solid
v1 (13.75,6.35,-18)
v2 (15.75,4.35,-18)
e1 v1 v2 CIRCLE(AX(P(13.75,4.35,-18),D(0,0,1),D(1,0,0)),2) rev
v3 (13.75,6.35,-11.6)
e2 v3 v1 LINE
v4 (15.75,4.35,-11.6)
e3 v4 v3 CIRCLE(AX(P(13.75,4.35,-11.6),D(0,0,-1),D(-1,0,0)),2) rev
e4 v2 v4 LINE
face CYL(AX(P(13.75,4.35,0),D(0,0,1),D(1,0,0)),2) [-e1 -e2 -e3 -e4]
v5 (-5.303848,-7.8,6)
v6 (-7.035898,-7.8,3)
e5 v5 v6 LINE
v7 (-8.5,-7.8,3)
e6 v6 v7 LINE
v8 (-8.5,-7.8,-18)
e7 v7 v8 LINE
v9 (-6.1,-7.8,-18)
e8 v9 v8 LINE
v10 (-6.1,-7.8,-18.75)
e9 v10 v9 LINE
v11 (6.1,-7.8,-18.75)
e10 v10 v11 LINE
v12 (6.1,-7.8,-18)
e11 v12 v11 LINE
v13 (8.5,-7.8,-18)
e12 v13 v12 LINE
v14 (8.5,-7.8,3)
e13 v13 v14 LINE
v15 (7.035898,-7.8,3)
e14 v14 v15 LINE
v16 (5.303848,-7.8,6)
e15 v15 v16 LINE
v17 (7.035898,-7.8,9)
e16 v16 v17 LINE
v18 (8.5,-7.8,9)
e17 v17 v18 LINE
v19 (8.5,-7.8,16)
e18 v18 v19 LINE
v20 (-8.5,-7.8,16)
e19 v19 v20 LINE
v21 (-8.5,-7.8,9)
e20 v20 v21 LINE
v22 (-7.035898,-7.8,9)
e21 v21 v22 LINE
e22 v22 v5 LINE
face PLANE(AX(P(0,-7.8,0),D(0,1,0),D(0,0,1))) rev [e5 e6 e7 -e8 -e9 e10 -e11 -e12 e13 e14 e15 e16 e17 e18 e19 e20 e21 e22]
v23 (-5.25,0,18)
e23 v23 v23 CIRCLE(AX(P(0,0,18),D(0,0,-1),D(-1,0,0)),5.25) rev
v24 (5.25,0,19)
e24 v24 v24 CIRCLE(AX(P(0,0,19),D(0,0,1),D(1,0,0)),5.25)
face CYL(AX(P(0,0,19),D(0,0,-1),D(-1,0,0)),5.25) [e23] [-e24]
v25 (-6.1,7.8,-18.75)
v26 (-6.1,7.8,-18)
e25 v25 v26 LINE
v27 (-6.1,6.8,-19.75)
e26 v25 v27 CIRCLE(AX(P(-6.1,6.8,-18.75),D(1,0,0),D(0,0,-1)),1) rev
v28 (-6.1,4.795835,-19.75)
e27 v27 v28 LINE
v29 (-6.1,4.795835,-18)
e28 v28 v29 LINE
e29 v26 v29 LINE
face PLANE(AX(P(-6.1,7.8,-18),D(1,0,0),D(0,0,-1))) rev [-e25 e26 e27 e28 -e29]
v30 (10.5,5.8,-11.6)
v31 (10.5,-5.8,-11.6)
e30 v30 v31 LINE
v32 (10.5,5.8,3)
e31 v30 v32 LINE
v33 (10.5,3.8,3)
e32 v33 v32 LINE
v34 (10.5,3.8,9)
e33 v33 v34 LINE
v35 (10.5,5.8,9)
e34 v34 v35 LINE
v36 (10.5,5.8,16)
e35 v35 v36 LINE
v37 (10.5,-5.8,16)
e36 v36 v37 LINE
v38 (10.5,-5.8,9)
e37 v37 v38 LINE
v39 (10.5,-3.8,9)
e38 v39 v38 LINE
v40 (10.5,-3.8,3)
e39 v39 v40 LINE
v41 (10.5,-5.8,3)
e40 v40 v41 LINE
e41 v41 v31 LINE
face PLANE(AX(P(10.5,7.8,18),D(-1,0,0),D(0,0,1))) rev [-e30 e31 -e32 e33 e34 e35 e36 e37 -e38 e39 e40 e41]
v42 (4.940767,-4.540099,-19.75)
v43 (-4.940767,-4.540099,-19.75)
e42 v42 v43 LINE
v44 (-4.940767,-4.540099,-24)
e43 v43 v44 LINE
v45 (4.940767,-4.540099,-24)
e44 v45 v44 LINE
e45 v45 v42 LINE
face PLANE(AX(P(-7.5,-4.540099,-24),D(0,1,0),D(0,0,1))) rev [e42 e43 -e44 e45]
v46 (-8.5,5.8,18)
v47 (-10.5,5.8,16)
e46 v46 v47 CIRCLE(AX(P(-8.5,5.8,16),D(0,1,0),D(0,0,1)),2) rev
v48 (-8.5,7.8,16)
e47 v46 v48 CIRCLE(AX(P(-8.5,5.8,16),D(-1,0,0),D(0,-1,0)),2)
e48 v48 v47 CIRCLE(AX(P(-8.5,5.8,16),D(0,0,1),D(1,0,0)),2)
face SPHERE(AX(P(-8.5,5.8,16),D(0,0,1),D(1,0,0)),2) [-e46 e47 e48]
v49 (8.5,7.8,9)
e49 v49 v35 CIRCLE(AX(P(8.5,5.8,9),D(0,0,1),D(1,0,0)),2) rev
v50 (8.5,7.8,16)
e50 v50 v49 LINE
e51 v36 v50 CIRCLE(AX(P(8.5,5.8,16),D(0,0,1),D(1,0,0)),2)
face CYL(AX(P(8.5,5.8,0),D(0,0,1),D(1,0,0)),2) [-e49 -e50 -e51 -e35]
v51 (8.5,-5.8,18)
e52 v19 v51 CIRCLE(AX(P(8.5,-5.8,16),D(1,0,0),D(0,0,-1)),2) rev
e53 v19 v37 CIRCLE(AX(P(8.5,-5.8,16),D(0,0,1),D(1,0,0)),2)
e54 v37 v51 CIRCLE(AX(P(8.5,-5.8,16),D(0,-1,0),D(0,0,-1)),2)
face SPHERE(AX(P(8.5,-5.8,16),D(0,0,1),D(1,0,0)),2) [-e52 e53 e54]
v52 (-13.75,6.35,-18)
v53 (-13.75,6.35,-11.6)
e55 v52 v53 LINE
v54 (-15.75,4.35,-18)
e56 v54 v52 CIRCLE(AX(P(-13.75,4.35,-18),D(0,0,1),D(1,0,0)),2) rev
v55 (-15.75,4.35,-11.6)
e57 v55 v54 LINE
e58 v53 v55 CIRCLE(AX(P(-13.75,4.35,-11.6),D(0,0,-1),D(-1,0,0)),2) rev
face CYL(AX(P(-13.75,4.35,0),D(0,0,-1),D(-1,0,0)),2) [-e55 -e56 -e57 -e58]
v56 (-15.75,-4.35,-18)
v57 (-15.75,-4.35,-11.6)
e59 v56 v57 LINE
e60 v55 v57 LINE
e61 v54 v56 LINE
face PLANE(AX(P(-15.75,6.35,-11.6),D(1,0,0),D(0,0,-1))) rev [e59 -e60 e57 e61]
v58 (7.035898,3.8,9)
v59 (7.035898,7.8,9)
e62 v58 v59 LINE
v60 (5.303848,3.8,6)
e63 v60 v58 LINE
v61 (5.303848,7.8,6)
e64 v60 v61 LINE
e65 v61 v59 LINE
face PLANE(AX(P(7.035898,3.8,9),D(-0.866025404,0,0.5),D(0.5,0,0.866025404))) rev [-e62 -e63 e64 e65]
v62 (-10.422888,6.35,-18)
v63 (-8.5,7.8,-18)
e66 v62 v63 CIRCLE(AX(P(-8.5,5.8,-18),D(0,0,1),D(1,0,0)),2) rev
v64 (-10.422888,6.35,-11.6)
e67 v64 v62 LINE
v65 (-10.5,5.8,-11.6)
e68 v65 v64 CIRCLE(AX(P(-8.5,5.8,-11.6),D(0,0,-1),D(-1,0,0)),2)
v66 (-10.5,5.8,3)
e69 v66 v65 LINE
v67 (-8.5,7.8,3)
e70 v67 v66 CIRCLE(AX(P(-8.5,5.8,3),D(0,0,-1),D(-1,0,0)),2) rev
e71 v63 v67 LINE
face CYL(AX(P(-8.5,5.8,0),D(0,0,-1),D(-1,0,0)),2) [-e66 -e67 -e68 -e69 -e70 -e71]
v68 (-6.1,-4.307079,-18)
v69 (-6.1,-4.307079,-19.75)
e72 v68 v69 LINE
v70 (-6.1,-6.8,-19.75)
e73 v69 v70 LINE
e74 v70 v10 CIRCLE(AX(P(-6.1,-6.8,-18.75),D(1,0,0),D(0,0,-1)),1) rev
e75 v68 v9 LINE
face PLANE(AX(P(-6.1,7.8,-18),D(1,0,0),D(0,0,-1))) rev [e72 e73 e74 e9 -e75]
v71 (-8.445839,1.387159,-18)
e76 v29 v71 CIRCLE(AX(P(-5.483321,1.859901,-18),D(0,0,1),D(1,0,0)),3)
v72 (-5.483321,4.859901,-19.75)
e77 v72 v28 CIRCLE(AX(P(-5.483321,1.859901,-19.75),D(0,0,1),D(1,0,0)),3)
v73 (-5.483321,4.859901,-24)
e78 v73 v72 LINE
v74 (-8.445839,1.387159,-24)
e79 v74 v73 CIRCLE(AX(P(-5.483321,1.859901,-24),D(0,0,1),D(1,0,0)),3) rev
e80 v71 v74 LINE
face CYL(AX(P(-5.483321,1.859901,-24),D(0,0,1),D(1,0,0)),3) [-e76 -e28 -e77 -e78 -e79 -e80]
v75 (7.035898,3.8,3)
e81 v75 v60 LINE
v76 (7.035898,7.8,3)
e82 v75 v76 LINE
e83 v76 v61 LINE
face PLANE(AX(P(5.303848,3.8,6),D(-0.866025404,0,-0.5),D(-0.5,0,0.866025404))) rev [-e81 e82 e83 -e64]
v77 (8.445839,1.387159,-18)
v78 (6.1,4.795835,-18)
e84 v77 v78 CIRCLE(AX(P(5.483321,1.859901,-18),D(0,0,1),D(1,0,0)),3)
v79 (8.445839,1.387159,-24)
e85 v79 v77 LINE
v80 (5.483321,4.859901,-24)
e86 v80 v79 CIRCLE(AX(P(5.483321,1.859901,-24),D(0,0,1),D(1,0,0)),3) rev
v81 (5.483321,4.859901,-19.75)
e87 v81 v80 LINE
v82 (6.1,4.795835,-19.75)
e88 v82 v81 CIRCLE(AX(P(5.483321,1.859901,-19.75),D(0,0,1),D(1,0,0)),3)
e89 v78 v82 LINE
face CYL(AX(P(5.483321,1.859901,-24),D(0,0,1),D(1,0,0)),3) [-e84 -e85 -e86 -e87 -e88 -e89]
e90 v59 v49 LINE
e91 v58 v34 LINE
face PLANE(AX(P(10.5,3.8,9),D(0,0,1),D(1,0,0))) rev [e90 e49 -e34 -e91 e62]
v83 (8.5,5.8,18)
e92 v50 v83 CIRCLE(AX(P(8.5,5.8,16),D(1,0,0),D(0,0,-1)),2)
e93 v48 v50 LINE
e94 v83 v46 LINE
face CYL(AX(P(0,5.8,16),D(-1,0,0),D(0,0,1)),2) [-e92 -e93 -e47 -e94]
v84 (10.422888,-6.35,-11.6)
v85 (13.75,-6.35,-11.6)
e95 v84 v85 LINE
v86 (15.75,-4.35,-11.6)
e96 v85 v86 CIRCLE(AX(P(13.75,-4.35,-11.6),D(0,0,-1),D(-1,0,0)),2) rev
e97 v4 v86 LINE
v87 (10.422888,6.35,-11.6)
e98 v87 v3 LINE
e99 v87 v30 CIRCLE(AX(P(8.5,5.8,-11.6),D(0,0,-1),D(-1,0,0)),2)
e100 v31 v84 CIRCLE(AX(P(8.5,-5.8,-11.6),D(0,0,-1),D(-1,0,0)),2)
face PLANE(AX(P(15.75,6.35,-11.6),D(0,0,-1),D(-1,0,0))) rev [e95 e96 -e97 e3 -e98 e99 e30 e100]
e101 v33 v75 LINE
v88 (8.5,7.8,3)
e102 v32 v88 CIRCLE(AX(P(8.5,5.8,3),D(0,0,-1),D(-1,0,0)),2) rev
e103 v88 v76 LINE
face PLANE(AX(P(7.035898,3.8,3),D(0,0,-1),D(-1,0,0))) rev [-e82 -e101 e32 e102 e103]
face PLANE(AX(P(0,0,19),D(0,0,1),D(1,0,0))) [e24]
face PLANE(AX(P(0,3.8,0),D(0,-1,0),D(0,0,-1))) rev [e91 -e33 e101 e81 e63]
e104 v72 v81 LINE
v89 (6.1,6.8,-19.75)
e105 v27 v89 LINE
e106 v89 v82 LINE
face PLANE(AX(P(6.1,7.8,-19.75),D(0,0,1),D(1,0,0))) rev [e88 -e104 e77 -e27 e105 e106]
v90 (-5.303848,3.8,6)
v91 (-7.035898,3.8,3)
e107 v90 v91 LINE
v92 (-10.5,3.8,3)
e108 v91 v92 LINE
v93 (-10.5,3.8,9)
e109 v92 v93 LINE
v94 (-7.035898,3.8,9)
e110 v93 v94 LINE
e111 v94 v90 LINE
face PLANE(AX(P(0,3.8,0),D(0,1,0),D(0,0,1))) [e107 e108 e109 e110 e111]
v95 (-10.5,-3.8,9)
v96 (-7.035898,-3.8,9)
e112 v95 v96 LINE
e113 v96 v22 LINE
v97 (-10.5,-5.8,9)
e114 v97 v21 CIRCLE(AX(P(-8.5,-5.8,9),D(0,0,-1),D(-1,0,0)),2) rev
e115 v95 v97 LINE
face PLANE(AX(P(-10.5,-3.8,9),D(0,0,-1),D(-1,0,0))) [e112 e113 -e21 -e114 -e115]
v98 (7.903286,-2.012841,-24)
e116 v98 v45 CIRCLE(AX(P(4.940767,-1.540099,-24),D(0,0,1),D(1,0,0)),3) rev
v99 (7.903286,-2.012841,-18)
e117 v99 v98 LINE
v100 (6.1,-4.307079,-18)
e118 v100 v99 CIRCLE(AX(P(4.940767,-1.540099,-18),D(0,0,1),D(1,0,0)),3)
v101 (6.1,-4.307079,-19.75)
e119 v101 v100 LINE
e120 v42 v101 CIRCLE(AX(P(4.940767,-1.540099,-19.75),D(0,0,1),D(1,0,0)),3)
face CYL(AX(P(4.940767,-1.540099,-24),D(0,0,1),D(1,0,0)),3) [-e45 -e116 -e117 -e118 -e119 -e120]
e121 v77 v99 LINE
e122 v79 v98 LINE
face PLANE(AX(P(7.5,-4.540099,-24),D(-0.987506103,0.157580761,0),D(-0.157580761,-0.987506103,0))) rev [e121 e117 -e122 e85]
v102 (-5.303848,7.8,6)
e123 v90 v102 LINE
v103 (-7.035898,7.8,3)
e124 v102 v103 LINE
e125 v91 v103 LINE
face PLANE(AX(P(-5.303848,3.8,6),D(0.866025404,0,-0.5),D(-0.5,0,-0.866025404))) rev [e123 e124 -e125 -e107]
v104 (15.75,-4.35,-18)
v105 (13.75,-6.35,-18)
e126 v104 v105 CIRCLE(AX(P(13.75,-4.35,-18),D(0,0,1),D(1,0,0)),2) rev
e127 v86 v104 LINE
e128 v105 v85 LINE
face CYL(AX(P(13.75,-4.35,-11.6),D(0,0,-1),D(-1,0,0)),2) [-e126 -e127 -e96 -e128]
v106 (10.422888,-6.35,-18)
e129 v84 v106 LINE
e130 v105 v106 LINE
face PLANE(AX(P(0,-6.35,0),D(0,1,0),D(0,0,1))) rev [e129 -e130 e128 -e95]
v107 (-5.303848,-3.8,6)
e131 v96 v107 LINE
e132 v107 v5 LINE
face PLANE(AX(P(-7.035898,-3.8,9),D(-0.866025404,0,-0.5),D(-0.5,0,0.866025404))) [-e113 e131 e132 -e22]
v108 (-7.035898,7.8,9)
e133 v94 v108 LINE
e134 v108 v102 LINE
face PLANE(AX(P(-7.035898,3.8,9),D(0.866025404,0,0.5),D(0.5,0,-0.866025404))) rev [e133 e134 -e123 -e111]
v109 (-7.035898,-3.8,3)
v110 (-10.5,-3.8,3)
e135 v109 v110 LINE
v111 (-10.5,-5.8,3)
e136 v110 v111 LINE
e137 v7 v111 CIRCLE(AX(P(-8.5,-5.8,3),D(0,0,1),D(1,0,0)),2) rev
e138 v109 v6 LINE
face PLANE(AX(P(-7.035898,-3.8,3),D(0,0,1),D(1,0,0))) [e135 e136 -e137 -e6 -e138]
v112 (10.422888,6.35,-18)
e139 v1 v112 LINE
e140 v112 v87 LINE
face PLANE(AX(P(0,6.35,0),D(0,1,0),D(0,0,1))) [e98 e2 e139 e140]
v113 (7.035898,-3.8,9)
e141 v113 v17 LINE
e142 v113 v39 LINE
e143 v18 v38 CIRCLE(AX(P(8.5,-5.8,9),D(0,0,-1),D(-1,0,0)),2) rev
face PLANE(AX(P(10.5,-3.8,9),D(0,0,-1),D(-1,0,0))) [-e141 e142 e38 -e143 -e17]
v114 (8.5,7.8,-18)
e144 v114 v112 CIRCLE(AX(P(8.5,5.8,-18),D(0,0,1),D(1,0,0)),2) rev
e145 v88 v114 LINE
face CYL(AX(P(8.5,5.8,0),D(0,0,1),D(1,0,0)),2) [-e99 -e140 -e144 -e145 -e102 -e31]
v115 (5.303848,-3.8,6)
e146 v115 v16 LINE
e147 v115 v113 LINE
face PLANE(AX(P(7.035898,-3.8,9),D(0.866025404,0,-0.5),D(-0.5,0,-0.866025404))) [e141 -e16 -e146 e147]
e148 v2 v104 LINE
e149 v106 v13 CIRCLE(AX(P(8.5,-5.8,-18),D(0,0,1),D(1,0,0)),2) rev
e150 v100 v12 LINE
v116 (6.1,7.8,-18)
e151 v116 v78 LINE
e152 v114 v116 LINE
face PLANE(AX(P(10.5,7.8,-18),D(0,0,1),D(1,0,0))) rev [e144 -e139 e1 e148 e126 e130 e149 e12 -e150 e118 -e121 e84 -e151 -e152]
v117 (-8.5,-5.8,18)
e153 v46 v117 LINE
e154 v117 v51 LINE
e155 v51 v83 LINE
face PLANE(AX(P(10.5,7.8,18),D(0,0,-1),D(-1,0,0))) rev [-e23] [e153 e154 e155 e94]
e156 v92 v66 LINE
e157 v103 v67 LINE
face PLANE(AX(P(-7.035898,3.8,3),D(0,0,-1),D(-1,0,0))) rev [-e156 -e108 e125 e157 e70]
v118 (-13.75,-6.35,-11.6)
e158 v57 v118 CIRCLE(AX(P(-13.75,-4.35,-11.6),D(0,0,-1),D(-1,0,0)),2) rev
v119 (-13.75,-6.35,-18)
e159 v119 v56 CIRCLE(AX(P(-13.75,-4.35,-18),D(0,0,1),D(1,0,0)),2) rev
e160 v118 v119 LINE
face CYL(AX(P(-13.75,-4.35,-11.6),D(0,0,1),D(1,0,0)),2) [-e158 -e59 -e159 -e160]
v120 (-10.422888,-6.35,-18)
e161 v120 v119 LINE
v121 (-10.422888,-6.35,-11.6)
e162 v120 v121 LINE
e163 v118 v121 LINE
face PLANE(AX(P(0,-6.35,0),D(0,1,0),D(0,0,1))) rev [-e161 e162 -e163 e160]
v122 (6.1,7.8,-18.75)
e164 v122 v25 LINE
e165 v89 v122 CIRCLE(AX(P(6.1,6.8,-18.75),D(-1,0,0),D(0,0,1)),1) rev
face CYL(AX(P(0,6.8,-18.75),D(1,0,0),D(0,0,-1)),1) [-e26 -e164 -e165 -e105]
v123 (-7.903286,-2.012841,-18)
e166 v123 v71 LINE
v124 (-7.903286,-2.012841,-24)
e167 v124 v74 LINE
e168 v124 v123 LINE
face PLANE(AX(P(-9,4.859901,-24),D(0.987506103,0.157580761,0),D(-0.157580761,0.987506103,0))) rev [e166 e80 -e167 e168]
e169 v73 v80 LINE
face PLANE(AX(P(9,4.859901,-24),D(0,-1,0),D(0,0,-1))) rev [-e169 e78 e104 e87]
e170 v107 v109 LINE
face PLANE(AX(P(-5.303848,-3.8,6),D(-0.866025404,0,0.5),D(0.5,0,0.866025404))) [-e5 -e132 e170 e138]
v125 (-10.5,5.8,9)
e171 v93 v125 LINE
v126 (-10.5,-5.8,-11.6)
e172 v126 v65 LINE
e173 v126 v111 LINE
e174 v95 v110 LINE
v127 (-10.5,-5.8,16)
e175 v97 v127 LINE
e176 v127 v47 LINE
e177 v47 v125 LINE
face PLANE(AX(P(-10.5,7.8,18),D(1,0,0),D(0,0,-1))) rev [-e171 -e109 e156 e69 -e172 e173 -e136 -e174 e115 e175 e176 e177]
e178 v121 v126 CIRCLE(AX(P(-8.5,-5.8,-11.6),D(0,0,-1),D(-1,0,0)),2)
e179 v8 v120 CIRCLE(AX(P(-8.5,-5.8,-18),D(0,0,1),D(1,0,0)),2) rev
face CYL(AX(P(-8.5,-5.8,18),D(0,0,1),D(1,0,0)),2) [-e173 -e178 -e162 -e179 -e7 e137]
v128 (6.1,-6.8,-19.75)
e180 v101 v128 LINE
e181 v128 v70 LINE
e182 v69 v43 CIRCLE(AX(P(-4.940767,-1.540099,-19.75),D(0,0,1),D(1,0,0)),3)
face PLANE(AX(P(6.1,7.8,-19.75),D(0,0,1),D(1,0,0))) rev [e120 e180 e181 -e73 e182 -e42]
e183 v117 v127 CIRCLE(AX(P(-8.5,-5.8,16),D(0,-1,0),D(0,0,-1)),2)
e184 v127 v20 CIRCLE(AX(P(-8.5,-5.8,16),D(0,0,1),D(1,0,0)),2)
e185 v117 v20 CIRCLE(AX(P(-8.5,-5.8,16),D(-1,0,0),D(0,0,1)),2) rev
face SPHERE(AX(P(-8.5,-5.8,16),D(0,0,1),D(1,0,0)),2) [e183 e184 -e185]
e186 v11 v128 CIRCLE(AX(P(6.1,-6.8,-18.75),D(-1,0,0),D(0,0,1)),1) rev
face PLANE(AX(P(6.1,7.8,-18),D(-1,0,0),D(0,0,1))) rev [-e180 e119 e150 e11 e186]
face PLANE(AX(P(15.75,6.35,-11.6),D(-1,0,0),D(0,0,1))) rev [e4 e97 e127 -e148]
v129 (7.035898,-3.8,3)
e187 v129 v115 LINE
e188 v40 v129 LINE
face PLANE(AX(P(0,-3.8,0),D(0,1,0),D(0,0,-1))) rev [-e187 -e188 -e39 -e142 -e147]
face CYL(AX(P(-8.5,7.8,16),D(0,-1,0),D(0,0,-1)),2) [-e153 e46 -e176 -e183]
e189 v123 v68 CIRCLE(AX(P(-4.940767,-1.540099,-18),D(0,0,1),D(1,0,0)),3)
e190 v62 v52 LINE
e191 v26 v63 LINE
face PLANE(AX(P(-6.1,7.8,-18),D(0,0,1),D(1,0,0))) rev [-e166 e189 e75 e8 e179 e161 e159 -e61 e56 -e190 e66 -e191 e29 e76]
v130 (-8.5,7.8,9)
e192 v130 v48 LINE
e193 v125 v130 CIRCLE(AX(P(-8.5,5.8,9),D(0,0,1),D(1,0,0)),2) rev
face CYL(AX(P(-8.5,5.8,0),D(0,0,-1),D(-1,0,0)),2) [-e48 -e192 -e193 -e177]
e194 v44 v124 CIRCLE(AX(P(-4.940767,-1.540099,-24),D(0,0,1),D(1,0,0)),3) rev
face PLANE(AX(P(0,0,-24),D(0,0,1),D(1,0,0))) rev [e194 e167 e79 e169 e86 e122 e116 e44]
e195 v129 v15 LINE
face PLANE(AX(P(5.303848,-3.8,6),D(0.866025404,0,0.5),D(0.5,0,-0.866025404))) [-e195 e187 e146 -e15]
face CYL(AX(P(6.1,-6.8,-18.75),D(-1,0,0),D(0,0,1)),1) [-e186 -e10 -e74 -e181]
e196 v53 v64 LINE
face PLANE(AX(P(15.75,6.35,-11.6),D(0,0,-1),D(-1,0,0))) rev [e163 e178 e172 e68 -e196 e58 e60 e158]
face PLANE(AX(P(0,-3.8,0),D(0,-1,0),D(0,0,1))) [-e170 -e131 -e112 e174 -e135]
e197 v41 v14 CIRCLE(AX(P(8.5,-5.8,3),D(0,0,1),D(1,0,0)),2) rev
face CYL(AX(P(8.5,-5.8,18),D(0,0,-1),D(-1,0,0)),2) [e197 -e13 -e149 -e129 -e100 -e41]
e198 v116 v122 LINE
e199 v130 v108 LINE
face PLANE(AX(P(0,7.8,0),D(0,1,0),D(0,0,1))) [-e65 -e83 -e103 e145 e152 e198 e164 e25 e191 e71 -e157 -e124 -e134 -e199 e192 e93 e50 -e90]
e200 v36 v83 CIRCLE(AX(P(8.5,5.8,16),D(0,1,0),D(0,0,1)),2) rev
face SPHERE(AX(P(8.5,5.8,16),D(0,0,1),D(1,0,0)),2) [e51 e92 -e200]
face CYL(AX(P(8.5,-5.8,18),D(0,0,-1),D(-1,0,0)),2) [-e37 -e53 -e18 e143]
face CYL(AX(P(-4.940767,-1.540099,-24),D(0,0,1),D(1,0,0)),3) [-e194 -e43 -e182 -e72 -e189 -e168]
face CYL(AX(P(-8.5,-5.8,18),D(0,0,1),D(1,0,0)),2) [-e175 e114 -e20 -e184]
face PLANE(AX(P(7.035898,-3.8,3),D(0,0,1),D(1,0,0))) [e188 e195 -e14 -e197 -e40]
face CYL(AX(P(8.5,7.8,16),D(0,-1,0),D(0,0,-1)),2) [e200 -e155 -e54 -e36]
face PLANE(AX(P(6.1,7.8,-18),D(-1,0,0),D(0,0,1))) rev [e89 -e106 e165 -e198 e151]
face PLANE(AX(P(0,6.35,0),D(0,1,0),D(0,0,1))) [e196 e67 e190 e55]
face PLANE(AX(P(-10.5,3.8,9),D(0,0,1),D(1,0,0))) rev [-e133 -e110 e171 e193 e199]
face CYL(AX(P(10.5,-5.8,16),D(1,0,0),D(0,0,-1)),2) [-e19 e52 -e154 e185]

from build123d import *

# Parameters (mm, degrees)
EXTRUDE_1_DEPTH     = 7.8
SKETCH_3_R          = 5.25
EXTRUDE_2_DEPTH     = 1
SKETCH_5_W          = 31.5
SKETCH_5_H          = 6.4
EXTRUDE_3_DEPTH     = 6.35
EXTRUDE_4_DEPTH     = 6
FILLET_1_R          = 3
FILLET_2_R          = 2
FILLET_3_R          = 1
CUT_EXTRUDE_1_DEPTH = 4


with BuildPart() as part:
    # 草图1 → 凸台-拉伸1 (new, symmetric)
    with BuildSketch(Plane(origin=(0, 0, 0), x_dir=(1, 0, 0), z_dir=(0, 1, 0))):
        Polygon((-6.1, 18), (-10.5, 18), (-10.5, -18), (10.5, -18), (10.5, 18), (6.1, 18), (6.1, 19.75), (-6.1, 19.75), align=None)
    extrude(amount=EXTRUDE_1_DEPTH, both=True)

    # 草图3 → 凸台-拉伸2 (add)
    with BuildSketch(Plane.XY.offset(18)):
        with Locations(Location((0, 0, 0), (0, 0, 180))):
            Circle(SKETCH_3_R)
    extrude(amount=EXTRUDE_2_DEPTH)

    # 草图5 → 凸台-拉伸3 (add, symmetric)
    with BuildSketch(Plane(origin=(0, 0, 0), x_dir=(1, 0, 0), z_dir=(0, 1, 0))):
        with Locations((0, 14.8)):
            Rectangle(SKETCH_5_W, SKETCH_5_H)
    extrude(amount=EXTRUDE_3_DEPTH, both=True)

    # 草图6 → 凸台-拉伸4 (add)
    with BuildSketch(Plane(origin=(0, 0, -18), x_dir=(-1, 0, 0), z_dir=(0, 0, -1))):
        Polygon((-9, 4.85990087), (9, 4.85990087), (7.5, -4.54009913), (-7.5, -4.54009913), align=None)
    extrude(amount=EXTRUDE_4_DEPTH)

    # 圆角1
    fillet_1_edges = [part.edges().sort_by_distance(p)[0] for p in [
        (-7.5, -4.54009913, -21),
        (7.5, -4.54009913, -21),
        (9, 4.85990087, -21),
        (-9, 4.85990087, -21),
    ]]
    fillet(fillet_1_edges, radius=FILLET_1_R)

    # 圆角2
    # the kernel refuses this fillet: 2 mm, written as the material it takes off along each edge
    with BuildSketch(Plane(origin=(-8.5, -5.8, 16), x_dir=(-1, 0, 0), z_dir=(0, -1, 0))) as fillet_2_piece_1_section:
        Polygon((0, 0), (FILLET_2_R, 0), (FILLET_2_R, -FILLET_2_R), (0, -FILLET_2_R), align=None)
    fillet_2_piece_1 = extrude(amount=FILLET_2_R, mode=Mode.PRIVATE)
    fillet_2_piece_1 = fillet_2_piece_1 - Plane(origin=(-8.5, -5.8, 16), x_dir=(0.7071067811865474, 0, -0.7071067811865476), z_dir=(0, -1, 0)) * Sphere(FILLET_2_R, mode=Mode.PRIVATE)
    add(fillet_2_piece_1, mode=Mode.SUBTRACT)
    with BuildSketch(Plane(origin=(8.5, -5.8, 16), x_dir=(0, -1, 0), z_dir=(1, 0, 0))) as fillet_2_piece_2_section:
        Polygon((0, 0), (FILLET_2_R, 0), (FILLET_2_R, -FILLET_2_R), (0, -FILLET_2_R), align=None)
    fillet_2_piece_2 = extrude(amount=FILLET_2_R, mode=Mode.PRIVATE)
    fillet_2_piece_2 = fillet_2_piece_2 - Plane(origin=(8.5, -5.8, 16), x_dir=(0, 0.7071067811865475, -0.7071067811865475), z_dir=(1, 0, 0)) * Sphere(FILLET_2_R, mode=Mode.PRIVATE)
    add(fillet_2_piece_2, mode=Mode.SUBTRACT)
    with BuildSketch(Plane(origin=(8.5, 5.8, 16), x_dir=(0, 1, 0), z_dir=(1, 0, 0))) as fillet_2_piece_3_section:
        Polygon((0, 0), (FILLET_2_R, 0), (FILLET_2_R, FILLET_2_R), (0, FILLET_2_R), align=None)
    fillet_2_piece_3 = extrude(amount=FILLET_2_R, mode=Mode.PRIVATE)
    fillet_2_piece_3 = fillet_2_piece_3 - Plane(origin=(8.5, 5.8, 16), x_dir=(0, -0.7071067811865475, -0.7071067811865475), z_dir=(1, 0, 0)) * Sphere(FILLET_2_R, mode=Mode.PRIVATE)
    add(fillet_2_piece_3, mode=Mode.SUBTRACT)
    with BuildSketch(Plane(origin=(-8.5, 5.8, 16), x_dir=(-1, 0, 0), z_dir=(0, 1, 0))) as fillet_2_piece_4_section:
        Polygon((0, 0), (FILLET_2_R, 0), (FILLET_2_R, FILLET_2_R), (0, FILLET_2_R), align=None)
    fillet_2_piece_4 = extrude(amount=FILLET_2_R, mode=Mode.PRIVATE)
    fillet_2_piece_4 = fillet_2_piece_4 - Plane(origin=(-8.5, 5.8, 16), x_dir=(0.7071067811865474, 0, -0.7071067811865476), z_dir=(0, 1, 0)) * Sphere(FILLET_2_R, mode=Mode.PRIVATE)
    add(fillet_2_piece_4, mode=Mode.SUBTRACT)
    with BuildSketch(Plane(origin=(-8.5, -7.8, 18), x_dir=(0, 0, -1), z_dir=(1, 0, 0))) as fillet_2_piece_5:
        with BuildLine():
            CenterArc((FILLET_2_R, FILLET_2_R), FILLET_2_R, 180, 90)
            Line((0, FILLET_2_R), (0, 0))
            Line((0, 0), (FILLET_2_R, 0))
        make_face()
    extrude(amount=17, mode=Mode.SUBTRACT)
    with BuildSketch(Plane(origin=(10.5, -5.8, 18), x_dir=(-1, 0, 0), z_dir=(0, 1, 0)), Plane(origin=(-10.5, -5.8, 18), x_dir=(0, 0, -1), z_dir=(0, 1, 0))) as fillet_2_piece_6:
        with BuildLine():
            CenterArc((FILLET_2_R, -FILLET_2_R), FILLET_2_R, 90, 90)
            Line((0, -FILLET_2_R), (0, 0))
            Line((0, 0), (FILLET_2_R, 0))
        make_face()
    extrude(amount=11.6, mode=Mode.SUBTRACT)
    with BuildSketch(Plane(origin=(-8.5, 7.8, 18), x_dir=(0, 0, -1), z_dir=(1, 0, 0))) as fillet_2_piece_7:
        with BuildLine():
            CenterArc((FILLET_2_R, -FILLET_2_R), FILLET_2_R, 90, 90)
            Line((0, -FILLET_2_R), (0, 0))
            Line((0, 0), (FILLET_2_R, 0))
        make_face()
    extrude(amount=17, mode=Mode.SUBTRACT)
    with BuildSketch(Plane(origin=(-10.5, -7.8, -23), x_dir=(1, 0, 0), z_dir=(0, 0, 1))) as fillet_2_piece_8_section:
        with BuildLine():
            CenterArc((FILLET_2_R, FILLET_2_R), FILLET_2_R, 180, 90)
            Line((0, FILLET_2_R), (0, 0))
            Line((0, 0), (FILLET_2_R, 0))
        make_face()
    fillet_2_piece_8 = extrude(amount=39, mode=Mode.PRIVATE)
    fillet_2_piece_8 = split(fillet_2_piece_8, bisect_by=Plane(origin=(-10.030513344, -6.35, -17.3), z_dir=(0, -1, 0)), keep=Keep.TOP, mode=Mode.PRIVATE)
    fillet_2_piece_8 = split(fillet_2_piece_8, bisect_by=Plane(origin=(-10.030513344, -7.391821247, -11.6), z_dir=(0, 0, -1)), keep=Keep.TOP, mode=Mode.PRIVATE)
    add(fillet_2_piece_8, mode=Mode.SUBTRACT)
    with BuildSketch(Plane(origin=(-10.5, -7.8, -23), x_dir=(1, 0, 0), z_dir=(0, 0, 1))) as fillet_2_piece_9_section:
        with BuildLine():
            CenterArc((FILLET_2_R, FILLET_2_R), FILLET_2_R, 180, 90)
            Line((0, FILLET_2_R), (0, 0))
            Line((0, 0), (FILLET_2_R, 0))
        make_face()
    fillet_2_piece_9 = extrude(amount=39, mode=Mode.PRIVATE)
    fillet_2_piece_9 = split(fillet_2_piece_9, bisect_by=Plane(origin=(-10.030513344, -6.35, 2.2), z_dir=(0, -1, 0)), keep=Keep.TOP, mode=Mode.PRIVATE)
    fillet_2_piece_9 = split(fillet_2_piece_9, bisect_by=Plane(origin=(-10.030513344, -7.391821247, -11.6), z_dir=(0, 0, 1)), keep=Keep.TOP, mode=Mode.PRIVATE)
    add(fillet_2_piece_9, mode=Mode.SUBTRACT)
    with BuildSketch(Plane(origin=(-10.5, -7.8, -23), x_dir=(1, 0, 0), z_dir=(0, 0, 1))) as fillet_2_piece_10_section:
        with BuildLine():
            CenterArc((FILLET_2_R, FILLET_2_R), FILLET_2_R, 180, 90)
            Line((0, FILLET_2_R), (0, 0))
            Line((0, 0), (FILLET_2_R, 0))
        make_face()
    fillet_2_piece_10 = extrude(amount=39, mode=Mode.PRIVATE)
    fillet_2_piece_10 = split(fillet_2_piece_10, bisect_by=Plane(origin=(-10.503237221, -6.35, 2.2), z_dir=(0, 1, 0)), keep=Keep.TOP, mode=Mode.PRIVATE)
    fillet_2_piece_10 = split(fillet_2_piece_10, bisect_by=Plane(origin=(-10.503237221, -6.128742069, -11.6), z_dir=(0, 0, 1)), keep=Keep.TOP, mode=Mode.PRIVATE)
    add(fillet_2_piece_10, mode=Mode.SUBTRACT)
    with BuildSketch(Plane(origin=(-10.5, 7.8, -23), x_dir=(0, -1, 0), z_dir=(0, 0, 1))) as fillet_2_piece_11_section:
        with BuildLine():
            CenterArc((FILLET_2_R, FILLET_2_R), FILLET_2_R, 180, 90)
            Line((0, FILLET_2_R), (0, 0))
            Line((0, 0), (FILLET_2_R, 0))
        make_face()
    fillet_2_piece_11 = extrude(amount=39, mode=Mode.PRIVATE)
    fillet_2_piece_11 = split(fillet_2_piece_11, bisect_by=Plane(origin=(-10.030513344, 7.391821247, -11.6), z_dir=(0, 0, -1)), keep=Keep.TOP, mode=Mode.PRIVATE)
    fillet_2_piece_11 = split(fillet_2_piece_11, bisect_by=Plane(origin=(-10.030513344, 6.35, -17.3), z_dir=(0, 1, 0)), keep=Keep.TOP, mode=Mode.PRIVATE)
    add(fillet_2_piece_11, mode=Mode.SUBTRACT)
    with BuildSketch(Plane(origin=(-10.5, 7.8, -23), x_dir=(0, -1, 0), z_dir=(0, 0, 1))) as fillet_2_piece_12_section:
        with BuildLine():
            CenterArc((FILLET_2_R, FILLET_2_R), FILLET_2_R, 180, 90)
            Line((0, FILLET_2_R), (0, 0))
            Line((0, 0), (FILLET_2_R, 0))
        make_face()
    fillet_2_piece_12 = extrude(amount=39, mode=Mode.PRIVATE)
    fillet_2_piece_12 = split(fillet_2_piece_12, bisect_by=Plane(origin=(-10.503237221, 6.128742069, -11.6), z_dir=(0, 0, 1)), keep=Keep.TOP, mode=Mode.PRIVATE)
    fillet_2_piece_12 = split(fillet_2_piece_12, bisect_by=Plane(origin=(-10.503237221, 6.35, 2.2), z_dir=(0, -1, 0)), keep=Keep.TOP, mode=Mode.PRIVATE)
    add(fillet_2_piece_12, mode=Mode.SUBTRACT)
    with BuildSketch(Plane(origin=(-10.5, 7.8, -23), x_dir=(0, -1, 0), z_dir=(0, 0, 1))) as fillet_2_piece_13_section:
        with BuildLine():
            CenterArc((FILLET_2_R, FILLET_2_R), FILLET_2_R, 180, 90)
            Line((0, FILLET_2_R), (0, 0))
            Line((0, 0), (FILLET_2_R, 0))
        make_face()
    fillet_2_piece_13 = extrude(amount=39, mode=Mode.PRIVATE)
    fillet_2_piece_13 = split(fillet_2_piece_13, bisect_by=Plane(origin=(-10.030513344, 7.391821247, -11.6), z_dir=(0, 0, 1)), keep=Keep.TOP, mode=Mode.PRIVATE)
    fillet_2_piece_13 = split(fillet_2_piece_13, bisect_by=Plane(origin=(-10.030513344, 6.35, 2.2), z_dir=(0, 1, 0)), keep=Keep.TOP, mode=Mode.PRIVATE)
    add(fillet_2_piece_13, mode=Mode.SUBTRACT)
    with BuildSketch(Plane(origin=(10.5, 7.8, 16), x_dir=(-1, 0, 0), z_dir=(0, 0, -1))) as fillet_2_piece_14_section:
        with BuildLine():
            CenterArc((FILLET_2_R, -FILLET_2_R), FILLET_2_R, 90, 90)
            Line((0, -FILLET_2_R), (0, 0))
            Line((0, 0), (FILLET_2_R, 0))
        make_face()
    fillet_2_piece_14 = extrude(amount=39, mode=Mode.PRIVATE)
    fillet_2_piece_14 = split(fillet_2_piece_14, bisect_by=Plane(origin=(10.030513344, 6.35, 2.2), z_dir=(0, 1, 0)), keep=Keep.TOP, mode=Mode.PRIVATE)
    fillet_2_piece_14 = split(fillet_2_piece_14, bisect_by=Plane(origin=(10.030513344, 7.391821247, -11.6), z_dir=(0, 0, 1)), keep=Keep.TOP, mode=Mode.PRIVATE)
    add(fillet_2_piece_14, mode=Mode.SUBTRACT)
    with BuildSketch(Plane(origin=(10.5, 7.8, 16), x_dir=(-1, 0, 0), z_dir=(0, 0, -1))) as fillet_2_piece_15_section:
        with BuildLine():
            CenterArc((FILLET_2_R, -FILLET_2_R), FILLET_2_R, 90, 90)
            Line((0, -FILLET_2_R), (0, 0))
            Line((0, 0), (FILLET_2_R, 0))
        make_face()
    fillet_2_piece_15 = extrude(amount=39, mode=Mode.PRIVATE)
    fillet_2_piece_15 = split(fillet_2_piece_15, bisect_by=Plane(origin=(10.503237221, 6.35, 2.2), z_dir=(0, -1, 0)), keep=Keep.TOP, mode=Mode.PRIVATE)
    fillet_2_piece_15 = split(fillet_2_piece_15, bisect_by=Plane(origin=(10.503237221, 6.128742069, -11.6), z_dir=(0, 0, 1)), keep=Keep.TOP, mode=Mode.PRIVATE)
    add(fillet_2_piece_15, mode=Mode.SUBTRACT)
    with BuildSketch(Plane(origin=(10.5, 7.8, 16), x_dir=(-1, 0, 0), z_dir=(0, 0, -1))) as fillet_2_piece_16_section:
        with BuildLine():
            CenterArc((FILLET_2_R, -FILLET_2_R), FILLET_2_R, 90, 90)
            Line((0, -FILLET_2_R), (0, 0))
            Line((0, 0), (FILLET_2_R, 0))
        make_face()
    fillet_2_piece_16 = extrude(amount=39, mode=Mode.PRIVATE)
    fillet_2_piece_16 = split(fillet_2_piece_16, bisect_by=Plane(origin=(10.030513344, 6.35, -17.3), z_dir=(0, 1, 0)), keep=Keep.TOP, mode=Mode.PRIVATE)
    fillet_2_piece_16 = split(fillet_2_piece_16, bisect_by=Plane(origin=(10.030513344, 7.391821247, -11.6), z_dir=(0, 0, -1)), keep=Keep.TOP, mode=Mode.PRIVATE)
    add(fillet_2_piece_16, mode=Mode.SUBTRACT)
    with BuildSketch(Plane(origin=(10.5, -7.8, 16), x_dir=(-1, 0, 0), z_dir=(0, 0, -1))) as fillet_2_piece_17_section:
        with BuildLine():
            CenterArc((FILLET_2_R, FILLET_2_R), FILLET_2_R, 180, 90)
            Line((0, FILLET_2_R), (0, 0))
            Line((0, 0), (FILLET_2_R, 0))
        make_face()
    fillet_2_piece_17 = extrude(amount=39, mode=Mode.PRIVATE)
    fillet_2_piece_17 = split(fillet_2_piece_17, bisect_by=Plane(origin=(10.030513344, -7.391821247, -11.6), z_dir=(0, 0, 1)), keep=Keep.TOP, mode=Mode.PRIVATE)
    fillet_2_piece_17 = split(fillet_2_piece_17, bisect_by=Plane(origin=(10.030513344, -6.35, 2.2), z_dir=(0, -1, 0)), keep=Keep.TOP, mode=Mode.PRIVATE)
    add(fillet_2_piece_17, mode=Mode.SUBTRACT)
    with BuildSketch(Plane(origin=(10.5, -7.8, 16), x_dir=(-1, 0, 0), z_dir=(0, 0, -1))) as fillet_2_piece_18_section:
        with BuildLine():
            CenterArc((FILLET_2_R, FILLET_2_R), FILLET_2_R, 180, 90)
            Line((0, FILLET_2_R), (0, 0))
            Line((0, 0), (FILLET_2_R, 0))
        make_face()
    fillet_2_piece_18 = extrude(amount=39, mode=Mode.PRIVATE)
    fillet_2_piece_18 = split(fillet_2_piece_18, bisect_by=Plane(origin=(10.503237221, -6.128742069, -11.6), z_dir=(0, 0, 1)), keep=Keep.TOP, mode=Mode.PRIVATE)
    fillet_2_piece_18 = split(fillet_2_piece_18, bisect_by=Plane(origin=(10.503237221, -6.35, 2.2), z_dir=(0, 1, 0)), keep=Keep.TOP, mode=Mode.PRIVATE)
    add(fillet_2_piece_18, mode=Mode.SUBTRACT)
    with BuildSketch(Plane(origin=(10.5, -7.8, 16), x_dir=(-1, 0, 0), z_dir=(0, 0, -1))) as fillet_2_piece_19_section:
        with BuildLine():
            CenterArc((FILLET_2_R, FILLET_2_R), FILLET_2_R, 180, 90)
            Line((0, FILLET_2_R), (0, 0))
            Line((0, 0), (FILLET_2_R, 0))
        make_face()
    fillet_2_piece_19 = extrude(amount=39, mode=Mode.PRIVATE)
    fillet_2_piece_19 = split(fillet_2_piece_19, bisect_by=Plane(origin=(10.030513344, -7.391821247, -11.6), z_dir=(0, 0, -1)), keep=Keep.TOP, mode=Mode.PRIVATE)
    fillet_2_piece_19 = split(fillet_2_piece_19, bisect_by=Plane(origin=(10.030513344, -6.35, -17.3), z_dir=(0, -1, 0)), keep=Keep.TOP, mode=Mode.PRIVATE)
    add(fillet_2_piece_19, mode=Mode.SUBTRACT)
    with BuildSketch(Plane(origin=(15.75, -6.35, -23), x_dir=(-1, 0, 0), z_dir=(0, 0, 1)), Plane(origin=(-15.75, 6.35, -6.6), x_dir=(0, -1, 0), z_dir=(0, 0, -1)), Plane(origin=(-15.75, -6.35, -6.6), x_dir=(1, 0, 0), z_dir=(0, 0, -1))) as fillet_2_piece_20:
        with BuildLine():
            CenterArc((FILLET_2_R, -FILLET_2_R), FILLET_2_R, 90, 90)
            Line((0, -FILLET_2_R), (0, 0))
            Line((0, 0), (FILLET_2_R, 0))
        make_face()
    extrude(amount=16.4, mode=Mode.SUBTRACT)
    with BuildSketch(Plane(origin=(15.75, 6.35, -23), x_dir=(-1, 0, 0), z_dir=(0, 0, 1))) as fillet_2_piece_21:
        with BuildLine():
            CenterArc((FILLET_2_R, FILLET_2_R), FILLET_2_R, 180, 90)
            Line((0, FILLET_2_R), (0, 0))
            Line((0, 0), (FILLET_2_R, 0))
        make_face()
    extrude(amount=16.4, mode=Mode.SUBTRACT)

    # 圆角3
    fillet_3_edges = [part.edges().sort_by_distance(p)[0] for p in [
        (0, 7.8, -19.75),
        (0, -7.8, -19.75),
    ]]
    fillet(fillet_3_edges, radius=FILLET_3_R)

    # 草图7 → 切除-拉伸1 (cut)
    with BuildSketch(Plane(origin=(0, 7.8, 0), x_dir=(1, 0, 0), z_dir=(0, 1, 0))):
        Polygon((-12.232050808, -6), (-10.5, -9), (-7.035898385, -9), (-5.303847577, -6), (-7.035898385, -3), (-10.5, -3), align=None)
        Polygon((10.5, -3), (12.232050808, -6), (10.5, -9), (7.035898385, -9), (5.303847577, -6), (7.035898385, -3), align=None)
    cut_extrude_1 = extrude(amount=-CUT_EXTRUDE_1_DEPTH, mode=Mode.SUBTRACT)

    # 镜向1: 切除-拉伸1 across plane
    add(cut_extrude_1.mirror(Plane.ZX), mode=Mode.SUBTRACT)


solid = part.part
